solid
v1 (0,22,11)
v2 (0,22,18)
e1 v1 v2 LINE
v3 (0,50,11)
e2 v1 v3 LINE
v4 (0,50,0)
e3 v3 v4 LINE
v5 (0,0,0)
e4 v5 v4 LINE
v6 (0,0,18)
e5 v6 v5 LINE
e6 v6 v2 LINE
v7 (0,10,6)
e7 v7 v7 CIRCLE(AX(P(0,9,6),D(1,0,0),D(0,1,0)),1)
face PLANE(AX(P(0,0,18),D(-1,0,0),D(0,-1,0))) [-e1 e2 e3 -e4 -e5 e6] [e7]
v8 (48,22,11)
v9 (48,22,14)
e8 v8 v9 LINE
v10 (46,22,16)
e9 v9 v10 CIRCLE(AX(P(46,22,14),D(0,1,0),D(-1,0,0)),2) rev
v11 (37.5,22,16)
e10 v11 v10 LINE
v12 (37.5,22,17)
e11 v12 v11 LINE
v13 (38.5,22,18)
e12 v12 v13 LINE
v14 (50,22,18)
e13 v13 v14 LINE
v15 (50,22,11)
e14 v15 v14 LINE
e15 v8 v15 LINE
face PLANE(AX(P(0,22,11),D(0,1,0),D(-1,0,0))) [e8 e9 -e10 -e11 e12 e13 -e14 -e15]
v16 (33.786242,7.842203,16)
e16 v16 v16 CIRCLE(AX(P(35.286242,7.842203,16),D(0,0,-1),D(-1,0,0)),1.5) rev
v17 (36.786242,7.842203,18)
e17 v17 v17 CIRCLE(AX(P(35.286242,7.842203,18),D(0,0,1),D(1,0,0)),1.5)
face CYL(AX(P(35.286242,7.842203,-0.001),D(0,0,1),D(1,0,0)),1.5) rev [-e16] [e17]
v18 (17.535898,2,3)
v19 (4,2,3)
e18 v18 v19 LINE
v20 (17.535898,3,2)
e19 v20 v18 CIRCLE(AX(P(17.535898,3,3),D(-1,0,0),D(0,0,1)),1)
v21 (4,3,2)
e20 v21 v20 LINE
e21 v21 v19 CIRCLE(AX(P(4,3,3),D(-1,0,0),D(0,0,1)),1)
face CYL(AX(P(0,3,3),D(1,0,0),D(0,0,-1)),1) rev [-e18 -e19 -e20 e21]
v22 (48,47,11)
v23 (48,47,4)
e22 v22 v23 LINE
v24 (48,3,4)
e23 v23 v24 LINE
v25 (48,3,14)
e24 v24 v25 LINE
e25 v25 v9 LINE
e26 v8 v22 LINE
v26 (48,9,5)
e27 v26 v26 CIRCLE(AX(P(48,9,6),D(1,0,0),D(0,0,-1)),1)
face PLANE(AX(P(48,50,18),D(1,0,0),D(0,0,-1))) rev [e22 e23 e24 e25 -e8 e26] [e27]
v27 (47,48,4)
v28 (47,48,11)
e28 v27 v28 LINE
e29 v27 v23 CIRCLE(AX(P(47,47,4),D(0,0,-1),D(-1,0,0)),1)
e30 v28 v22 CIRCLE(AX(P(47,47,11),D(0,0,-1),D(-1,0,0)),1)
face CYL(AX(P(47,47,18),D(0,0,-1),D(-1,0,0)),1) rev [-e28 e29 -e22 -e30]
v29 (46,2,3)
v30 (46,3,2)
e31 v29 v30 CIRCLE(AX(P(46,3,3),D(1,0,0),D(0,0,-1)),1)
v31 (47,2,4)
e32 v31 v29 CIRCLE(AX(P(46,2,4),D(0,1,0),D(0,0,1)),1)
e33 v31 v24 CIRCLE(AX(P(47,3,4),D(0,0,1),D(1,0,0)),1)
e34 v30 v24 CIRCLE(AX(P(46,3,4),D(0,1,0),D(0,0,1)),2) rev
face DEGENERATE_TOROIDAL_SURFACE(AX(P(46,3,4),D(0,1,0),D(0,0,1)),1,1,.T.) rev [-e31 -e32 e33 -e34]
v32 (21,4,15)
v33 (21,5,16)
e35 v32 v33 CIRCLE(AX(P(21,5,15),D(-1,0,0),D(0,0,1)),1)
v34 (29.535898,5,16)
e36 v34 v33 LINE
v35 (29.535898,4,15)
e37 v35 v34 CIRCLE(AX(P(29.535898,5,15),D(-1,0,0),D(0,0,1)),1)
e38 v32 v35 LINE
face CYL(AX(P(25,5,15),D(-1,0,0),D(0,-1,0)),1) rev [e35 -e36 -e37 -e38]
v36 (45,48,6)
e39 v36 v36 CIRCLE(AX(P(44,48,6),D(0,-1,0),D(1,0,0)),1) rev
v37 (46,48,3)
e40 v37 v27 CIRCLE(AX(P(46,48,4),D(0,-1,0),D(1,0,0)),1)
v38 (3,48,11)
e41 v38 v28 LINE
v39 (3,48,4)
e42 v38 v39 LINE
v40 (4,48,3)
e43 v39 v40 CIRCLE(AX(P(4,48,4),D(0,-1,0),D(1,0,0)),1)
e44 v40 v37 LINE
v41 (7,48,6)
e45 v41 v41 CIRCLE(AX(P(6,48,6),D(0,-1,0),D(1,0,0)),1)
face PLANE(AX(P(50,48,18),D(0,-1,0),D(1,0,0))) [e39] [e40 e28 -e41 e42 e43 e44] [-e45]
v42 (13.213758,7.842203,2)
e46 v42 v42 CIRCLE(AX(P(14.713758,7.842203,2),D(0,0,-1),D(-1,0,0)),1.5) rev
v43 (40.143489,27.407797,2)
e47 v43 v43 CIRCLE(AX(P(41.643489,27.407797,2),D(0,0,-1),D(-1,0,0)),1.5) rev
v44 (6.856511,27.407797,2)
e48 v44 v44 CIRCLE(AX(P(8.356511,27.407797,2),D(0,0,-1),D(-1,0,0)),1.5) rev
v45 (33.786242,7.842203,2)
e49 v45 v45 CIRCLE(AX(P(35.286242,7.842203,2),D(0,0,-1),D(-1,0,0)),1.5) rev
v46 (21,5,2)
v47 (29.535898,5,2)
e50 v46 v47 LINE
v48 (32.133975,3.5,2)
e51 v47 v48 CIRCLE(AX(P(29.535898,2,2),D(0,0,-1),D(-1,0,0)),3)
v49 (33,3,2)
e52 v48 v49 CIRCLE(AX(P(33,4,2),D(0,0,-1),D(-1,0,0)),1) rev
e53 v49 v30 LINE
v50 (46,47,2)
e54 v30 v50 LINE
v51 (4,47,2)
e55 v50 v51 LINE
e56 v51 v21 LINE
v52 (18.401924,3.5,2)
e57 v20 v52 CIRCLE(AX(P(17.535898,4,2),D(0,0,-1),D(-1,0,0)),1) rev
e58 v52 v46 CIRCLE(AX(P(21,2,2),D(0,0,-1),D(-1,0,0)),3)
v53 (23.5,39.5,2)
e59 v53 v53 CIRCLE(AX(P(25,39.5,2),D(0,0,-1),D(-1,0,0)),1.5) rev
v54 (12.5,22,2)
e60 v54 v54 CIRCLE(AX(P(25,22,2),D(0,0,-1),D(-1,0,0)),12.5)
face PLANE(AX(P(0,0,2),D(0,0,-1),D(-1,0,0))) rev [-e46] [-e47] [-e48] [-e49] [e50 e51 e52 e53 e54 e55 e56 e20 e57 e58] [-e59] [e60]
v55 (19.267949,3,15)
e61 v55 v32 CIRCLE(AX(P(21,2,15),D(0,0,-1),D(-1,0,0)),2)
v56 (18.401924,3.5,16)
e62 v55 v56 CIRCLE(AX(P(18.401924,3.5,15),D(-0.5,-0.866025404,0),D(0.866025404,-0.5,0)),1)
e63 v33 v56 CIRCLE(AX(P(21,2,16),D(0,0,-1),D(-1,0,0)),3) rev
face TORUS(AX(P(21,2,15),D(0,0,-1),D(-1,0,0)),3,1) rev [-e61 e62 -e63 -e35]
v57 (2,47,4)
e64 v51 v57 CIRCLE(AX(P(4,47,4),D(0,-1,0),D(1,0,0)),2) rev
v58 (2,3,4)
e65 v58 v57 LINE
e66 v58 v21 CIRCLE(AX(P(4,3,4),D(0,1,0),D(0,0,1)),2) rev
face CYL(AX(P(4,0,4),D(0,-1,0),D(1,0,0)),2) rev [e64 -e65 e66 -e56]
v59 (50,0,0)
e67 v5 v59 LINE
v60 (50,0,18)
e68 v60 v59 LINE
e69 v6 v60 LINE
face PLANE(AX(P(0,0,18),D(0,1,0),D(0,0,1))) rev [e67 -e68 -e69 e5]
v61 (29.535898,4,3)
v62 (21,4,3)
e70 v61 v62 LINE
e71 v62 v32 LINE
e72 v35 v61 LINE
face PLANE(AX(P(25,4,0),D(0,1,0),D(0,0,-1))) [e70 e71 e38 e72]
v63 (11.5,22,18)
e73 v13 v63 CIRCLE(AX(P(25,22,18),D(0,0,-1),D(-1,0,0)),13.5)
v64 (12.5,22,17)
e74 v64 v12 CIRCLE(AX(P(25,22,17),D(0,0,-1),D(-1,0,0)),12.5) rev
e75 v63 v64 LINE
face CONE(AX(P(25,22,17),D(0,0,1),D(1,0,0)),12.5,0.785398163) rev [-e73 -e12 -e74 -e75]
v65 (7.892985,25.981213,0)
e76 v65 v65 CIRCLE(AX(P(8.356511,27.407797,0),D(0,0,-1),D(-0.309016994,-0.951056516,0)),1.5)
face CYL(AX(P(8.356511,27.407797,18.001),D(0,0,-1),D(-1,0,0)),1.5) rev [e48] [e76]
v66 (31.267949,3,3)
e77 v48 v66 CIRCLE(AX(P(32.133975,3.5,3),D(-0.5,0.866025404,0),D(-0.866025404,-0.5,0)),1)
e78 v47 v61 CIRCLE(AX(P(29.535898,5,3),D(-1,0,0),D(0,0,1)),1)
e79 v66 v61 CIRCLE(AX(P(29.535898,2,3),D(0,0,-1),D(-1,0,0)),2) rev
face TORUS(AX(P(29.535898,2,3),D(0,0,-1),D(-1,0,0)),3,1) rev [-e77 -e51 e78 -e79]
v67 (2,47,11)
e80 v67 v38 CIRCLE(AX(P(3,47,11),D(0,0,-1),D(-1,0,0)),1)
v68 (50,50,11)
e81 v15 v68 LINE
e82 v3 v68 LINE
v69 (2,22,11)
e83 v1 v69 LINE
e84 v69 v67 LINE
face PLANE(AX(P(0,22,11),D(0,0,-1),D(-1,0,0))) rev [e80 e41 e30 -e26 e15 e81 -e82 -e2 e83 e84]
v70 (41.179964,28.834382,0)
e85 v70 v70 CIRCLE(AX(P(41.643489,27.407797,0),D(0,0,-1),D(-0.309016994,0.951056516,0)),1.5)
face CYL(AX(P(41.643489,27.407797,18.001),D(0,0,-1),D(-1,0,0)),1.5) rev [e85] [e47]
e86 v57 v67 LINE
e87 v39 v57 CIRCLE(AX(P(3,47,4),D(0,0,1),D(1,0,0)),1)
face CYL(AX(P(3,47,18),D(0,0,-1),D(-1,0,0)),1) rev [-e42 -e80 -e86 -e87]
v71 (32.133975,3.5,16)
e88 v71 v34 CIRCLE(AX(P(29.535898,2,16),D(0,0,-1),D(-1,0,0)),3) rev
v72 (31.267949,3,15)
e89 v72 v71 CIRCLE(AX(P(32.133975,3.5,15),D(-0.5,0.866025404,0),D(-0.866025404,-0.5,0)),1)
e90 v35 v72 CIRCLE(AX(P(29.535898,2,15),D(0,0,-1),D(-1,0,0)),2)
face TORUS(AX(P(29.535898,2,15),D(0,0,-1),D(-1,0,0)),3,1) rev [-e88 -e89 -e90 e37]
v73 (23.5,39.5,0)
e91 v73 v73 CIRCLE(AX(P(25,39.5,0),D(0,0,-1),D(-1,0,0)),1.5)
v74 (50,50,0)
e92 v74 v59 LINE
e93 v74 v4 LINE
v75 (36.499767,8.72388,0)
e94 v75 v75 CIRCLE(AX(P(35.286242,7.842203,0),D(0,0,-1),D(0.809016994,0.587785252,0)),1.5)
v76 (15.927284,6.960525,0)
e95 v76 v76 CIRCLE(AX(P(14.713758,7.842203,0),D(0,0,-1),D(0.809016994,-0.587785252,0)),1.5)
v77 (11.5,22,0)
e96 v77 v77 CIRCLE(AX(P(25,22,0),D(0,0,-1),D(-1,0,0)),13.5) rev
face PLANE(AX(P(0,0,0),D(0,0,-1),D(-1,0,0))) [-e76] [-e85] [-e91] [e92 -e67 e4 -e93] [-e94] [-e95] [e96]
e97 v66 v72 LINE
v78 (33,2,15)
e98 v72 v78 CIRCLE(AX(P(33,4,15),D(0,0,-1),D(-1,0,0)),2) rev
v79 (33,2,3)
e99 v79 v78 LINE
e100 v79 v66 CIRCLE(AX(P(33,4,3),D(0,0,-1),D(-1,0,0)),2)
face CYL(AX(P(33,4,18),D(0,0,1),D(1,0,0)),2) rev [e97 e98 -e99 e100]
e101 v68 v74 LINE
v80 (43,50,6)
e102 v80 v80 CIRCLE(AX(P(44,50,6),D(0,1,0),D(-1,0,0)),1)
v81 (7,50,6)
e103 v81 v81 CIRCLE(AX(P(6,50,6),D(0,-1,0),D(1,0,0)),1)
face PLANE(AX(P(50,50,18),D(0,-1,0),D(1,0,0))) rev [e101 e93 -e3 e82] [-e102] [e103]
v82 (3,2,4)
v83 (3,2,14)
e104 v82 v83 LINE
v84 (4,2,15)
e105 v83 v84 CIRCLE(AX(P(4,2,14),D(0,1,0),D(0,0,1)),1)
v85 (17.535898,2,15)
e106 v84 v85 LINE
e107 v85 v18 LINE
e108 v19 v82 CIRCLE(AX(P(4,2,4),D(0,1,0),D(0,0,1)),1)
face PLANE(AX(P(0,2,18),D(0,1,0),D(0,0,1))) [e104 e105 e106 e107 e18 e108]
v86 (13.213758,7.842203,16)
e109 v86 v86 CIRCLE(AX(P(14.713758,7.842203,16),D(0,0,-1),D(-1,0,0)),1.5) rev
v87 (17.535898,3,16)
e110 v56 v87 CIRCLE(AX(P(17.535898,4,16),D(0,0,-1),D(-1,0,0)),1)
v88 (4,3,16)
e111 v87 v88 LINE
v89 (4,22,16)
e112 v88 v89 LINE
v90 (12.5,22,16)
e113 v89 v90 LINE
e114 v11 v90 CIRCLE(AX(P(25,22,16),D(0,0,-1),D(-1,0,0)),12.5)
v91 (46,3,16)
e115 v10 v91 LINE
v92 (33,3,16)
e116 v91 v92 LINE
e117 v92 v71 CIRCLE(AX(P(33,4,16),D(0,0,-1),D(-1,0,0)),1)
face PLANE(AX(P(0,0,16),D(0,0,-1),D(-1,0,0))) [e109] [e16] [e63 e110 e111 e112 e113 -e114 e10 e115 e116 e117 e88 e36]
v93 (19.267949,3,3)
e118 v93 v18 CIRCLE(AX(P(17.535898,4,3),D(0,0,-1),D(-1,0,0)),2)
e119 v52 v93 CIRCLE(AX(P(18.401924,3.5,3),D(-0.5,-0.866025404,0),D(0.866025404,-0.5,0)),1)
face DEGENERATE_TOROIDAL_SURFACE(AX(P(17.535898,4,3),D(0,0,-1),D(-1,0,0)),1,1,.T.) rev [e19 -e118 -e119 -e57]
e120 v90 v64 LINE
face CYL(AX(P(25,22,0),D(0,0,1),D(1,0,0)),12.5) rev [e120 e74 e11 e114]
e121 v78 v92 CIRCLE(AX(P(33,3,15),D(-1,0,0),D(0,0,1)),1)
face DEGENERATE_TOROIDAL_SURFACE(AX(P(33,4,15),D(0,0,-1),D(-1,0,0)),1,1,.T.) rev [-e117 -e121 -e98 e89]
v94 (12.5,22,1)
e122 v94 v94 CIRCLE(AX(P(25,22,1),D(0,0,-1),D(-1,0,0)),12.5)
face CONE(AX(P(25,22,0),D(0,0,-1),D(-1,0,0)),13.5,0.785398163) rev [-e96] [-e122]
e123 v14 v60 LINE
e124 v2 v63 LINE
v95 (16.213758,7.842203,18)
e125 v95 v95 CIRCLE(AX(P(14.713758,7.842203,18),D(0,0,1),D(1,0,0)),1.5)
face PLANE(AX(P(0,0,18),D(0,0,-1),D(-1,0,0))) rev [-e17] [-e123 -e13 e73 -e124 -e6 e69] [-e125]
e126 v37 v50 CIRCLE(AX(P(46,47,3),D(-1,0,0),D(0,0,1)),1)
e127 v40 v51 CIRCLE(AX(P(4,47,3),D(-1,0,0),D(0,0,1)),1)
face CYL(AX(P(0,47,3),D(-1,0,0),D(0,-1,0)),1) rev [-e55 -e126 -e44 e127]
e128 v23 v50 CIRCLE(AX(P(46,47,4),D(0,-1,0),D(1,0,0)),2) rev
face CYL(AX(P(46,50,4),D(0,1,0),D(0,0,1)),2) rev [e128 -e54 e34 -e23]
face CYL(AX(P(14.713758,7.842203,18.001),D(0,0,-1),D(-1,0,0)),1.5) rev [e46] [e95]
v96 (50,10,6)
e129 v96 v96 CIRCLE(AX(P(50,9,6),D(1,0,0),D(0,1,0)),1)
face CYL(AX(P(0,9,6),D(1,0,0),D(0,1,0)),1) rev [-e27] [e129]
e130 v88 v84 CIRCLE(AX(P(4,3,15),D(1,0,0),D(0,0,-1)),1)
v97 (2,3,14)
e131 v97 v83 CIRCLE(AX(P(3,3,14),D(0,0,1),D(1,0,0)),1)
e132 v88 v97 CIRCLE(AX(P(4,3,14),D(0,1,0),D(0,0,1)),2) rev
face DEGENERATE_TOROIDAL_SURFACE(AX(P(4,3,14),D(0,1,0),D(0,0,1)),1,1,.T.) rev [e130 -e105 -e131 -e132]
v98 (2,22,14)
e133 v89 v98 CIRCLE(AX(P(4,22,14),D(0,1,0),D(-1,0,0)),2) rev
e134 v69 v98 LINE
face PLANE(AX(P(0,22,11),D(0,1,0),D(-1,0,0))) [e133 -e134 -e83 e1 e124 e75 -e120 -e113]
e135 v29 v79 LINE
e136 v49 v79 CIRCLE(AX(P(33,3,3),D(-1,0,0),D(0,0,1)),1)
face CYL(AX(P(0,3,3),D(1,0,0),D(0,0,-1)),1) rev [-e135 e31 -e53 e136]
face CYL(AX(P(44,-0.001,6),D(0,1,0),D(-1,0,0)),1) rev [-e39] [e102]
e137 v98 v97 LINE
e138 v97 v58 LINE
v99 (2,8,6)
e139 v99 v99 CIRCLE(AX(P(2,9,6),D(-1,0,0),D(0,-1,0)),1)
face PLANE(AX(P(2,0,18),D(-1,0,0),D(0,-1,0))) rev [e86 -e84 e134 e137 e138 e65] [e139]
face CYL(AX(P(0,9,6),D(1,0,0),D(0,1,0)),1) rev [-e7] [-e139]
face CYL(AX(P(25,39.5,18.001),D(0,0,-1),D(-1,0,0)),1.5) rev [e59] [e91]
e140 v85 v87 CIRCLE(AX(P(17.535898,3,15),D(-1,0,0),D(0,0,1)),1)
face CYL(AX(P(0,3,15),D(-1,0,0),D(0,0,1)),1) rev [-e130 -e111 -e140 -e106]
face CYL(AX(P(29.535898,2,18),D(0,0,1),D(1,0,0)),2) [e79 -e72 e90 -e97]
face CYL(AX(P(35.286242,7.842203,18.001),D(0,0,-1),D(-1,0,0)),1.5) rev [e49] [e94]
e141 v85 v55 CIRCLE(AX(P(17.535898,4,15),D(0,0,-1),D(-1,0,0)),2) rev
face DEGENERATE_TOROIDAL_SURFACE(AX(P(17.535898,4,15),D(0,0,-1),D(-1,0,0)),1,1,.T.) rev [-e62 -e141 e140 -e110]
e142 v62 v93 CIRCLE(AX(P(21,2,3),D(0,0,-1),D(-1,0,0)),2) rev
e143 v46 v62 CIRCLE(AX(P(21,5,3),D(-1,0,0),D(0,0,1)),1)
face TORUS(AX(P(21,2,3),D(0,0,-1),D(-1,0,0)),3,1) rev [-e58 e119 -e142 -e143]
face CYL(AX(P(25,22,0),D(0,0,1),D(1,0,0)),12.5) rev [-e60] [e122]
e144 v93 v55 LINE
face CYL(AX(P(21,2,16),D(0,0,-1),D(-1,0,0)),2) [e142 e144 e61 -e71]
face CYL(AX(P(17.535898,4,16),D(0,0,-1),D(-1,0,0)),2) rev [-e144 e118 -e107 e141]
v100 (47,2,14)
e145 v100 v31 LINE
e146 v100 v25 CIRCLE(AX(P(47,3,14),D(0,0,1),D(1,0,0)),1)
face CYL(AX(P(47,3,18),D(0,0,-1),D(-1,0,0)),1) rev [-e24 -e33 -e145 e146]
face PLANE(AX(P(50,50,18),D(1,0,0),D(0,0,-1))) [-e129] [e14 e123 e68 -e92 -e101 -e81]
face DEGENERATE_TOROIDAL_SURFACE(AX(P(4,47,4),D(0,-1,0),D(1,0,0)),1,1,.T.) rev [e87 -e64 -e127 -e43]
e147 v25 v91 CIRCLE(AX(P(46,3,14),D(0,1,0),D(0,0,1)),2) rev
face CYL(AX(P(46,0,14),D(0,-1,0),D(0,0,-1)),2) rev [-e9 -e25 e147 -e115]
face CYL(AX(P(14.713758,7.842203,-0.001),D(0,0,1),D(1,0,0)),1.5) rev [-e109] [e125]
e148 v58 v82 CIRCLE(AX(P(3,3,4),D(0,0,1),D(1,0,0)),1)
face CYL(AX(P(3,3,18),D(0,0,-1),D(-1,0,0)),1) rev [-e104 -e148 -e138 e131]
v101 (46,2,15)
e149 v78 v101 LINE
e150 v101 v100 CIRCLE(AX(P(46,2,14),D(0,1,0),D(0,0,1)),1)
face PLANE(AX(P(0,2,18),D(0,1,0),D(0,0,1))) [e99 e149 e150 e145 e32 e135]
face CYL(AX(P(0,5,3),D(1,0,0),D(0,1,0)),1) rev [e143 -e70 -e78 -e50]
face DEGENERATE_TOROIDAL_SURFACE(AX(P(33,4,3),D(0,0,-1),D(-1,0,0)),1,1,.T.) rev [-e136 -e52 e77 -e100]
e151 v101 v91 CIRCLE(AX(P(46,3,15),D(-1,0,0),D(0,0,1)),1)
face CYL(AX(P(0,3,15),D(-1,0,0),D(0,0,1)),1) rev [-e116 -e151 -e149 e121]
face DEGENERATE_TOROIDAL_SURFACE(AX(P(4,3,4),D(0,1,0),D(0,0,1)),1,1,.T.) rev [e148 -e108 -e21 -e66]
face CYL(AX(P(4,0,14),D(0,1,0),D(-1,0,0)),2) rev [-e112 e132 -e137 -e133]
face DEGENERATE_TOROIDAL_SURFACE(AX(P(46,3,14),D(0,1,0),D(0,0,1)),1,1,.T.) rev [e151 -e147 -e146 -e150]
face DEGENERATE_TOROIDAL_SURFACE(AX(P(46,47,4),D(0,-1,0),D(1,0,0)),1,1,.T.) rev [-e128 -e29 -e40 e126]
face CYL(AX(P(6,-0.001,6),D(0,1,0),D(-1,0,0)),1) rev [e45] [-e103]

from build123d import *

# Parameters (mm, degrees)
SKETCH1_W          = 50
SKETCH1_H          = 50
MAIN_DEPTH         = 18
SKETCH2_W          = 7
SKETCH2_H          = 28
CUT_EXTRUDE1_DEPTH = 73.965745388
SHELL1_T           = -2
RIB1_REACH         = 72.285
SKETCH11_WALLS_W   = 12
SKETCH11_WALLS_H   = 158.570267126
SKETCH3_R          = 12.5
CUT_EXTRUDE2_DEPTH = 73.965745388
CHAMFER1_SIZE      = 1
CUT_EXTRUDE3_REACH = 74.966
SKETCH4_R          = 1
SKETCH6_R          = 1
CUT_EXTRUDE4_DEPTH = 73.965745388
CUT_EXTRUDE7_REACH = 74.966
SKETCH9_R          = 1.5
CIRPATTERN1_COUNT  = 5
CUT_EXTRUDE8_REACH = 74.966
SKETCH13_R         = 1.5
FILLET1_R          = 2
FILLET2_R          = 2
FILLET4_R          = 2
FILLET5_R          = 2
FILLET6_R          = 2
FILLET3_R          = 1


with BuildPart() as part:
    # Sketch1 → main (new body)
    with BuildSketch(Plane.XY):
        with Locations((25, 25)):
            Rectangle(SKETCH1_W, SKETCH1_H)
    extrude(amount=MAIN_DEPTH)

    # Sketch2 → Cut-Extrude1 (cut, through all)
    with BuildSketch(Plane(origin=(50, 0, 0), x_dir=(0, 0, -1), z_dir=(1, 0, 0))):
        with Locations((-14.5, 36)):
            Rectangle(SKETCH2_W, SKETCH2_H)
    extrude(amount=-CUT_EXTRUDE1_DEPTH, mode=Mode.SUBTRACT)

    # Shell1
    shell1_openings = [part.faces().sort_by_distance(p)[0] for p in [
        (25, 36, 11),
        (25, 22, 14.5),
    ]]
    offset(amount=SHELL1_T, openings=shell1_openings, kind=Kind.INTERSECTION)

    # Sketch11 walls → Rib1 (add, up to next)
    with BuildSketch(Plane(origin=(0, 4, 0), x_dir=(-1, 0, 0), z_dir=(0, 1, 0)), mode=Mode.PRIVATE) as rib1_sk1:
        with Locations((-25, 8)):
            Rectangle(SKETCH11_WALLS_W, SKETCH11_WALLS_H)
    rib1_tool1 = extrude(rib1_sk1.sketch, amount=-RIB1_REACH, mode=Mode.PRIVATE) - part.part
    add(rib1_tool1.solids().sort_by_distance((25, 4, 8))[0])

    # Sketch3 → Cut-Extrude2 (cut, through all)
    with BuildSketch(Plane.XY.offset(18)):
        with Locations((25, 22)):
            Circle(SKETCH3_R)
    extrude(amount=-CUT_EXTRUDE2_DEPTH, mode=Mode.SUBTRACT)

    # Chamfer1
    chamfer1_edges = [part.edges().sort_by_distance(p)[0] for p in [
        (12.5, 22, 0),
        (25, 9.5, 18),
    ]]
    chamfer(chamfer1_edges, length=CHAMFER1_SIZE)

    # Sketch4 → Cut-Extrude3 (cut, up to next)
    with BuildSketch(Plane(origin=(0, 50, 0), x_dir=(-1, 0, 0), z_dir=(0, 1, 0)), mode=Mode.PRIVATE) as cut_extrude3_sk1:
        with Locations((-44, 6)):
            Circle(SKETCH4_R)
    cut_extrude3_tool1 = extrude(cut_extrude3_sk1.sketch, amount=-CUT_EXTRUDE3_REACH, mode=Mode.PRIVATE) & part.part
    # Sketch4 → Cut-Extrude3 (cut, up to next)
    with BuildSketch(Plane(origin=(0, 50, 0), x_dir=(-1, 0, 0), z_dir=(0, 1, 0)), mode=Mode.PRIVATE) as cut_extrude3_sk2:
        with Locations(Location((-6, 6, 0), (0, 0, 180))):
            Circle(SKETCH4_R)
    cut_extrude3_tool2 = extrude(cut_extrude3_sk2.sketch, amount=-CUT_EXTRUDE3_REACH, mode=Mode.PRIVATE) & part.part
    add(cut_extrude3_tool1.solids().sort_by_distance((44, 50, 6))[0], mode=Mode.SUBTRACT)
    add(cut_extrude3_tool2.solids().sort_by_distance((6, 50, 6))[0], mode=Mode.SUBTRACT)

    # Sketch6 → Cut-Extrude4 (cut, through all)
    with BuildSketch(Plane(origin=(50, 0, 0), x_dir=(0, 0, -1), z_dir=(1, 0, 0))):
        with Locations(Location((-6, 9, 0), (0, 0, 90))):
            Circle(SKETCH6_R)
    extrude(amount=-CUT_EXTRUDE4_DEPTH, mode=Mode.SUBTRACT)

    # Sketch9 → Cut-Extrude7 (cut, up to next)
    with BuildSketch(Plane(origin=(0, 0, 0), x_dir=(-1, 0, 0), z_dir=(0, 0, -1)), mode=Mode.PRIVATE) as cut_extrude7_sk1:
        with Locations((-25, 39.5)):
            Circle(SKETCH9_R)
    cut_extrude7_tool1 = extrude(cut_extrude7_sk1.sketch, amount=-CUT_EXTRUDE7_REACH, mode=Mode.PRIVATE) & part.part
    cut_extrude7 = cut_extrude7_tool1.solids().sort_by_distance((25, 39.5, 0))[0]
    add(cut_extrude7, mode=Mode.SUBTRACT)

    # CirPattern1: Cut-Extrude7 ×5 about axis
    cirpattern1_axis = Axis((25, 22, 0), (0, 0, 1))
    for i in range(1, CIRPATTERN1_COUNT):
        add(cut_extrude7.rotate(cirpattern1_axis, i * 360 / CIRPATTERN1_COUNT), mode=Mode.SUBTRACT)

    # Sketch13 → Cut-Extrude8 (cut, up to next)
    with BuildSketch(Plane.XY.offset(18), mode=Mode.PRIVATE) as cut_extrude8_sk1:
        with Locations(Location((35.286241915, 7.842202598, 0), (0, 0, 180))):
            Circle(SKETCH13_R)
    cut_extrude8_tool1 = extrude(cut_extrude8_sk1.sketch, amount=-CUT_EXTRUDE8_REACH, mode=Mode.PRIVATE) & part.part
    # Sketch13 → Cut-Extrude8 (cut, up to next)
    with BuildSketch(Plane.XY.offset(18), mode=Mode.PRIVATE) as cut_extrude8_sk2:
        with Locations(Location((14.713758085, 7.842202598, 0), (0, 0, 180))):
            Circle(SKETCH13_R)
    cut_extrude8_tool2 = extrude(cut_extrude8_sk2.sketch, amount=-CUT_EXTRUDE8_REACH, mode=Mode.PRIVATE) & part.part
    add(cut_extrude8_tool1.solids().sort_by_distance((35.286242, 7.842203, 18))[0], mode=Mode.SUBTRACT)
    add(cut_extrude8_tool2.solids().sort_by_distance((14.713758, 7.842203, 18))[0], mode=Mode.SUBTRACT)

    # Fillet1
    fillet1_edges = [part.edges().sort_by_distance(p)[0] for p in [
        (2, 12, 16),
        (48, 12, 16),
        (2, 25, 2),
        (48, 25, 2),
    ]]
    fillet(fillet1_edges, radius=FILLET1_R)

    # Fillet2
    fillet2_edges = [part.edges().sort_by_distance(p)[0] for p in [
        (31, 2, 9),
    ]]
    fillet(fillet2_edges, radius=FILLET2_R - 0.0001)  # a hair under: the kernel refuses the full size

    # Fillet4
    fillet4_edges = [part.edges().sort_by_distance(p)[0] for p in [
        (31, 4, 9),
    ]]
    fillet(fillet4_edges, radius=FILLET4_R)

    # Fillet5
    fillet5_edges = [part.edges().sort_by_distance(p)[0] for p in [
        (19, 4, 9),
    ]]
    fillet(fillet5_edges, radius=FILLET5_R - 0.0001)  # a hair under: the kernel refuses the full size

    # Fillet6
    fillet6_edges = [part.edges().sort_by_distance(p)[0] for p in [
        (19, 2, 9),
    ]]
    fillet(fillet6_edges, radius=FILLET6_R)

    # Fillet3
    fillet3_edges = [part.edges().sort_by_distance(p)[0] for p in [
        (48, 2, 9),
        (47.414213562, 2, 15.414213562),
        (47.414213562, 2, 2.585786438),
        (10.76792806, 2, 2),
        (25, 48, 2),
        (2.585786438, 48, 2.585786438),
        (47.414213562, 48, 2.585786438),
        (10.76792806, 2, 16),
        (2, 2, 9),
        (2.585786438, 2, 2.585786438),
        (2.585786438, 2, 15.414213562),
        (39.49995, 2, 2),
        (39.49995, 2, 16),
        (31.9999375, 2.267943012, 16),
        (31.9999375, 2.267943012, 2),
        (30.535868621, 3.73204359, 2),
        (30.535868621, 3.73204359, 16),
        (25.26787806, 4, 16),
        (25.26787806, 4, 2),
        (19.9999375, 3.732056988, 16),
        (19.9999375, 3.732056988, 2),
        (18.535868621, 2.26795641, 16),
        (18.535868621, 2.26795641, 2),
        (2, 48, 7.5),
        (48, 48, 7.5),
    ]]
    fillet(fillet3_edges, radius=FILLET3_R)


solid = part.part
